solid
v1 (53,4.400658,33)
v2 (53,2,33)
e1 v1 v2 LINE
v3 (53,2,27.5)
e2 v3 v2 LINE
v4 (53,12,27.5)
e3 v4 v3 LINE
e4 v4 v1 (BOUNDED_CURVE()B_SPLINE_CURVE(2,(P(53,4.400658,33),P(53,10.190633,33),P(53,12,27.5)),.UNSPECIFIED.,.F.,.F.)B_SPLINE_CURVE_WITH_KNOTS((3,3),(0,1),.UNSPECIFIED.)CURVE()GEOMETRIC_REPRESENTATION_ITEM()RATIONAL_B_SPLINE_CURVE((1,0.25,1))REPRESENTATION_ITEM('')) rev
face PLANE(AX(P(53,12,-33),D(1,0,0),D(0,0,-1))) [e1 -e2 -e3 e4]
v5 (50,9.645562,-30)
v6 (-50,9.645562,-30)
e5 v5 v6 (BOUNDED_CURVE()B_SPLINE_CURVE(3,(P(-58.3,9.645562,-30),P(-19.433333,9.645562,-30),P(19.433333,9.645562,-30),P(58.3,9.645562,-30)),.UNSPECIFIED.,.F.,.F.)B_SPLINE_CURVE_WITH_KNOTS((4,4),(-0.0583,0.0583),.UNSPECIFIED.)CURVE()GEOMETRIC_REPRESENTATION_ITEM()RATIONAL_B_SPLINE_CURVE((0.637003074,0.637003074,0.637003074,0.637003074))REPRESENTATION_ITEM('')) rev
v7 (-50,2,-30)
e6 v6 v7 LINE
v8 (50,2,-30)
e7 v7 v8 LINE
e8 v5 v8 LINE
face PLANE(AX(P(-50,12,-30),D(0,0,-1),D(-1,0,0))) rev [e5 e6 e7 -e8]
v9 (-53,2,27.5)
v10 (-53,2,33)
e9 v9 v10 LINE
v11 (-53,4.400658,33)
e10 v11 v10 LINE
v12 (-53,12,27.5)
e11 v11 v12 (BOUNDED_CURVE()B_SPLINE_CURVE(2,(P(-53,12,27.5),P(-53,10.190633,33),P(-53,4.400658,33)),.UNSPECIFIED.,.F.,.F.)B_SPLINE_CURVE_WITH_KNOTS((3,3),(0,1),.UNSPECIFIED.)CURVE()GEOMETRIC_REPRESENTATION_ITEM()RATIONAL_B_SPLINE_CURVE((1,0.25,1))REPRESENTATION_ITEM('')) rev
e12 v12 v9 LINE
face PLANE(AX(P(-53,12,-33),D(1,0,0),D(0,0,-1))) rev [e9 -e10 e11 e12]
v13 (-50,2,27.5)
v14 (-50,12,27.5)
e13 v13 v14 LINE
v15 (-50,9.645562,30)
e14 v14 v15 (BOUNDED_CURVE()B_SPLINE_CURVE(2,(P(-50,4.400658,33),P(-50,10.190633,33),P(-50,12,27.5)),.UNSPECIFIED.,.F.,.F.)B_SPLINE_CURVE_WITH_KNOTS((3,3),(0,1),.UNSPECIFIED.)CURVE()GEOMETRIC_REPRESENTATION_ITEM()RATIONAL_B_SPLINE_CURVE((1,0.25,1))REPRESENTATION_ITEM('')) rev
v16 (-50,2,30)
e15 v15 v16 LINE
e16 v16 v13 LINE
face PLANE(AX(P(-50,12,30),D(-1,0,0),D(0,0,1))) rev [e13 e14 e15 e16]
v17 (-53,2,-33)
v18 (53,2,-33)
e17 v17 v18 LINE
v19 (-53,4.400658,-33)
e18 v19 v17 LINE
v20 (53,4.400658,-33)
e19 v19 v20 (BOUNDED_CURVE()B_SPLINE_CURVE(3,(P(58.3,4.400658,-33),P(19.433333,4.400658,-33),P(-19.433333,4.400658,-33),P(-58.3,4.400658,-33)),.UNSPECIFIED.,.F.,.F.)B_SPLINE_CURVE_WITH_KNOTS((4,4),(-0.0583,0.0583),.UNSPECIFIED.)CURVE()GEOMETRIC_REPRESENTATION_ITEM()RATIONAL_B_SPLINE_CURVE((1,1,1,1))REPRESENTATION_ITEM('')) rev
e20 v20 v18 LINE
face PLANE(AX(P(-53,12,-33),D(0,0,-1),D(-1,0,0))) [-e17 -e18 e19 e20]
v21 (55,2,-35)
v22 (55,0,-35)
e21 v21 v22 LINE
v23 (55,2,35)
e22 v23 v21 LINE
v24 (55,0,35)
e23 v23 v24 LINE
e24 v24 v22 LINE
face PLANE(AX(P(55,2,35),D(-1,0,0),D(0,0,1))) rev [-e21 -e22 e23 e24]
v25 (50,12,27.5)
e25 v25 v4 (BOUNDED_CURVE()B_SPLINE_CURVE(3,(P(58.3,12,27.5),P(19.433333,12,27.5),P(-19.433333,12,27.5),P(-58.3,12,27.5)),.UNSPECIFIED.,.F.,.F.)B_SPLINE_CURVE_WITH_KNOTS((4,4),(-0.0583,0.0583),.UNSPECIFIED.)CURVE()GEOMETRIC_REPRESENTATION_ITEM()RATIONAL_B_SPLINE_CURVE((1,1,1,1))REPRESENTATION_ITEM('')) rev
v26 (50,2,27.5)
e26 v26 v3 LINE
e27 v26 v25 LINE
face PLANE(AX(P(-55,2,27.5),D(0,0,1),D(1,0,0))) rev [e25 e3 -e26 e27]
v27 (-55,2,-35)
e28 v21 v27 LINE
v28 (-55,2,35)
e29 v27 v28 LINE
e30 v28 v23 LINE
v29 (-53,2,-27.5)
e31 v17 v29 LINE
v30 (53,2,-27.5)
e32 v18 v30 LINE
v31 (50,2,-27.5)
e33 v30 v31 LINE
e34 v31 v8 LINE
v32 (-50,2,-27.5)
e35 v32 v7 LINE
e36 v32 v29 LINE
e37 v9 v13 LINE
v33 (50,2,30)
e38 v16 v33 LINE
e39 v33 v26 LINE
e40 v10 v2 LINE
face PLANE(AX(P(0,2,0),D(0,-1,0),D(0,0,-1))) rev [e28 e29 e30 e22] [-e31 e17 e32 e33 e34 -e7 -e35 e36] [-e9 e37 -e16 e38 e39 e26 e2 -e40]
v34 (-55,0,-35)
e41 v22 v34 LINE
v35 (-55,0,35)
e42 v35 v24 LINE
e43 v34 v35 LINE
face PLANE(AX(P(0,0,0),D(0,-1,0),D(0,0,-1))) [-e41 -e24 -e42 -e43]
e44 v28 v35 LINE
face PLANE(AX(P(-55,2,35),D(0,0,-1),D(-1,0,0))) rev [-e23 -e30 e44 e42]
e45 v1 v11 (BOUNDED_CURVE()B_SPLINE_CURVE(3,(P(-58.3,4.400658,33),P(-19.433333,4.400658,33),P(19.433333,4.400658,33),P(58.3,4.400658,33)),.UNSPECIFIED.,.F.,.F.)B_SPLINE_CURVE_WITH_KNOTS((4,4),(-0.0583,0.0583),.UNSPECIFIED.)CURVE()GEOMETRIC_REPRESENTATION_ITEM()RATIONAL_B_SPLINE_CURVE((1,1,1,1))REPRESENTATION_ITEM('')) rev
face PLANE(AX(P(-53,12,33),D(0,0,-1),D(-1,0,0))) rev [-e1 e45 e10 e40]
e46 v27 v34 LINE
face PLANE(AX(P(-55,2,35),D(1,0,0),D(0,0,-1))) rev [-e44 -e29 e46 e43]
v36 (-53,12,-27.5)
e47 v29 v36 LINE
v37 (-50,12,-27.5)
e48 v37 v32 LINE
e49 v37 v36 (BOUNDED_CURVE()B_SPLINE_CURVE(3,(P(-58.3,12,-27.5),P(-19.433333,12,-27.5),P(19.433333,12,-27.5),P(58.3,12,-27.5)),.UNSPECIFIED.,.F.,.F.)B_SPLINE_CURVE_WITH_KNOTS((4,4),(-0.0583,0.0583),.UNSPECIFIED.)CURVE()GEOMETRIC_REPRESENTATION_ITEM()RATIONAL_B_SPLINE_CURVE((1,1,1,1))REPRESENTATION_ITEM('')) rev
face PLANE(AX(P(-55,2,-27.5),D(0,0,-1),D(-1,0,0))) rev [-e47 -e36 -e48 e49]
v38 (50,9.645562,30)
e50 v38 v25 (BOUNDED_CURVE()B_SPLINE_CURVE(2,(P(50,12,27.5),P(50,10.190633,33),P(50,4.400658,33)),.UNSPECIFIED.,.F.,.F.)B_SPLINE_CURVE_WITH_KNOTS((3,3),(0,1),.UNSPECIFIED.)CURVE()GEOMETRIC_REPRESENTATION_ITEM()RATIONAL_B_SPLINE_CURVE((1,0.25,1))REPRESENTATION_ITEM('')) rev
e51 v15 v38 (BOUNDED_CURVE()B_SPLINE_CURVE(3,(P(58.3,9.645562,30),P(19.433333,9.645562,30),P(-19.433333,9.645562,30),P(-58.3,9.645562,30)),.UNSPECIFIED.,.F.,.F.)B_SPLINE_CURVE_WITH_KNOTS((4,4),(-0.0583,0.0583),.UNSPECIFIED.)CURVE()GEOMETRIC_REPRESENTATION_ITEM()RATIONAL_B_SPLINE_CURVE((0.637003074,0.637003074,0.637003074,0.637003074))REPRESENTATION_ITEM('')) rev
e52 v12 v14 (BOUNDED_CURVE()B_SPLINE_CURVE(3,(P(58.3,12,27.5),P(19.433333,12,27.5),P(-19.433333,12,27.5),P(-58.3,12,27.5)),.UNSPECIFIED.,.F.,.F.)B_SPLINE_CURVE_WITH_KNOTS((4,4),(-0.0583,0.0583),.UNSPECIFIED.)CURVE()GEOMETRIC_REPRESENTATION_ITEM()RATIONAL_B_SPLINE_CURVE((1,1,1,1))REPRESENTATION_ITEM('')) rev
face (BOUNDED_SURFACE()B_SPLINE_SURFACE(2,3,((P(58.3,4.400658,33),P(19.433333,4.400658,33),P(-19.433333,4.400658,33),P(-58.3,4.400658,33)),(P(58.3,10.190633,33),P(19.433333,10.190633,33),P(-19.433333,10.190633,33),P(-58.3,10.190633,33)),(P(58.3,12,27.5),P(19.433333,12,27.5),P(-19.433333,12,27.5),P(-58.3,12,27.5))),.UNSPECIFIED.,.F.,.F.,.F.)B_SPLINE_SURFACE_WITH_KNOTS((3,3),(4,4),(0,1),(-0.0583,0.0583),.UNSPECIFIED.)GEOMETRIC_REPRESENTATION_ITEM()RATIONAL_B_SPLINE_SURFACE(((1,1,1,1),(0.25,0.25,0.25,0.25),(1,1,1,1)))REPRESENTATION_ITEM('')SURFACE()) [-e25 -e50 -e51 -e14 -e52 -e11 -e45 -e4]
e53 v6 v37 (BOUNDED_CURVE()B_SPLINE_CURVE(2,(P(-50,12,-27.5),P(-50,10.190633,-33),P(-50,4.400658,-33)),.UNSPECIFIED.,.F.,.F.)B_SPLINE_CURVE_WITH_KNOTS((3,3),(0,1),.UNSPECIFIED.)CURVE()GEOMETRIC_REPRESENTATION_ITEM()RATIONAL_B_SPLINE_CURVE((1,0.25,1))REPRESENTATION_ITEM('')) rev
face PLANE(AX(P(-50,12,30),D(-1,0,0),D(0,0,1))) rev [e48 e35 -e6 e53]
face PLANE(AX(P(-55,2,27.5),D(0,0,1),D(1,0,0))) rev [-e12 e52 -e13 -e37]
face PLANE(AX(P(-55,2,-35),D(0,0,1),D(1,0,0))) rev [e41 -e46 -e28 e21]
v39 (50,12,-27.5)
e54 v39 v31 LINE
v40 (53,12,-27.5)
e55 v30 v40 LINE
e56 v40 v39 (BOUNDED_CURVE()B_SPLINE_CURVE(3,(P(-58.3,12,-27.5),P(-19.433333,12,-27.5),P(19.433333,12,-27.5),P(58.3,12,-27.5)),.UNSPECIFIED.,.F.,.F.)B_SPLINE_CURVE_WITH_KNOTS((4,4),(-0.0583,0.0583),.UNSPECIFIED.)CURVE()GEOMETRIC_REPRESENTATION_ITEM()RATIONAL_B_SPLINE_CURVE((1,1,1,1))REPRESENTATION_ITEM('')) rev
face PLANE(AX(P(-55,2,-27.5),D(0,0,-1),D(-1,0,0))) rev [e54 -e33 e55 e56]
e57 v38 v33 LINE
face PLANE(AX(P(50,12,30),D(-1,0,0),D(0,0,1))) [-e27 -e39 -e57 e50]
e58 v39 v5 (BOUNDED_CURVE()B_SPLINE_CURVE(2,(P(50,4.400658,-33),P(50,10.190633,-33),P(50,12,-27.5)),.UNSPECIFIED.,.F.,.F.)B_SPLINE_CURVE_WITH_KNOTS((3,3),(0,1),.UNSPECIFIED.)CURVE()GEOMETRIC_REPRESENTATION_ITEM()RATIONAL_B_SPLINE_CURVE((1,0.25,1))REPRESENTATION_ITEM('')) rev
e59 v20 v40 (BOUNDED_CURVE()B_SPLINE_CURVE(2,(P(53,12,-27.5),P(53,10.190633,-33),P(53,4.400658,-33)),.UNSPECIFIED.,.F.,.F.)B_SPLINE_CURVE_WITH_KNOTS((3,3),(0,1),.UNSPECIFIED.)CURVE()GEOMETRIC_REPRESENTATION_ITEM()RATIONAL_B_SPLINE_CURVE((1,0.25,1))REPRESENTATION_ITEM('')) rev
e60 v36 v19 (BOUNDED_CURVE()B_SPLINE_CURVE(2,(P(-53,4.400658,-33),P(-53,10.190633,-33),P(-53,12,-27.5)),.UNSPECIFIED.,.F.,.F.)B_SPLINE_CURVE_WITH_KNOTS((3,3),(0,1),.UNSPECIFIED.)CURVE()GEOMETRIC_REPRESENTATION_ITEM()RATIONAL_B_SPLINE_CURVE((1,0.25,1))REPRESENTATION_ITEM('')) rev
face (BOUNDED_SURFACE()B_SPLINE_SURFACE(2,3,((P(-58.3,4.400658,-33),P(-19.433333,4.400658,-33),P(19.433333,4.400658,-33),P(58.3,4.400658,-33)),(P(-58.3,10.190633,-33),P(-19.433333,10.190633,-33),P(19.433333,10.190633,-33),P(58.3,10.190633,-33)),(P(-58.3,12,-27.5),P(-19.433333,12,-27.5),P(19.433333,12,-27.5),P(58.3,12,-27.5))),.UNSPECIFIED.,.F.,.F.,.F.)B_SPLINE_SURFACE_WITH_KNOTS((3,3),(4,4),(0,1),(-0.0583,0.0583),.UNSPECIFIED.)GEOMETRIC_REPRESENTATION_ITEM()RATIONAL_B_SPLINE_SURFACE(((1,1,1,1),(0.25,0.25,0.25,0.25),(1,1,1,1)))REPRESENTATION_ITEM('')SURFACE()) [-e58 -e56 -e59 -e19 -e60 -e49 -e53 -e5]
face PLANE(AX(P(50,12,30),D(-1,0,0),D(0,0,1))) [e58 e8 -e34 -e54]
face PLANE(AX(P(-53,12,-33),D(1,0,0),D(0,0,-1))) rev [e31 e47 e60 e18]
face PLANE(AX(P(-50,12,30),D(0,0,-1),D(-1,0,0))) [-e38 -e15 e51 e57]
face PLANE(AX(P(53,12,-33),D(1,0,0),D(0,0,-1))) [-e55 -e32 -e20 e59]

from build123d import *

# Parameters (mm, degrees)
CROQUIS1_W              = 110
CROQUIS1_H              = 70
SALIENTE_EXTRUIR1_DEPTH = 2
CROQUIS2_W              = 106
CROQUIS2_H              = 66
CROQUIS2_W_2            = 100
CROQUIS2_H_2            = 60
SALIENTE_EXTRUIR2_DEPTH = 10
CROQUIS3_W              = 110
CROQUIS3_H              = 55
CORTAR_EXTRUIR1_DEPTH   = 10
REDONDEO1_START         = -53
REDONDEO1_DEPTH         = 106


with BuildPart() as part:
    # Croquis1 → Saliente-Extruir1 (new body)
    with BuildSketch(Plane(origin=(0, 0, 0), x_dir=(1, 0, 0), z_dir=(0, 1, 0))):
        Rectangle(CROQUIS1_W, CROQUIS1_H)
    extrude(amount=SALIENTE_EXTRUIR1_DEPTH)

    # Croquis2 → Saliente-Extruir2 (add)
    with BuildSketch(Plane(origin=(0, 2, 0), x_dir=(1, 0, 0), z_dir=(0, 1, 0))):
        Rectangle(CROQUIS2_W, CROQUIS2_H)
        Rectangle(CROQUIS2_W_2, CROQUIS2_H_2, mode=Mode.SUBTRACT)
    extrude(amount=SALIENTE_EXTRUIR2_DEPTH)

    # Croquis3 → Cortar-Extruir1 (cut)
    with BuildSketch(Plane(origin=(0, 12, 0), x_dir=(1, 0, 0), z_dir=(0, 1, 0))):
        Rectangle(CROQUIS3_W, CROQUIS3_H)
    extrude(amount=-CORTAR_EXTRUIR1_DEPTH, mode=Mode.SUBTRACT)

    # Redondeo1: read off the stored shape, not the designer's step
    # Redondeo1 outline → Redondeo1 (cut)
    with BuildSketch(Plane.YZ.offset(REDONDEO1_START)):
        with BuildLine():
            Line((4.400657923, -33), (12, -33))
            Line((12, -33), (12, -27.5))
            add(Edge.make_bspline(
                [(12, -27.5), (11.925717186, -27.725800205), (11.717980707, -28.062974077), (11.294012734, -28.57513658), (10.552168001, -29.267993446), (8.343872585, -31.051001592), (6.627785298, -32.237452301), (5.39060754, -32.810235795), (4.741950411, -33), (4.400657923, -33)],
                knots=[0.589454173, 0.589454173, 0.589454173, 0.589454173, 0.589454173, 0.589454173, 1, 1, 1, 1, 1.589454173, 1.589454173, 1.589454173, 1.589454173, 1.589454173, 1.589454173], degree=5, weights=[1, 1, 1.007998589, 1.001618266, 1, 1, 0.973408773, 1.007044093, 1, 1]))
        make_face()
        with BuildLine():
            Line((12, 33), (4.400657923, 33))
            add(Edge.make_bspline(
                [(4.400657923, 33), (4.741950411, 33), (5.39060754, 32.810235795), (6.627785298, 32.237452301), (8.343872585, 31.051001592), (10.552168001, 29.267993446), (11.294012734, 28.57513658), (11.717980707, 28.062974077), (11.925717186, 27.725800205), (12, 27.5)],
                knots=[0, 0, 0, 0, 0, 0, 0.589454173, 0.589454173, 0.589454173, 0.589454173, 1, 1, 1, 1, 1, 1], degree=5, weights=[1, 1, 1.007044093, 0.973408773, 1, 1, 1.001618266, 1.007998589, 1, 1]))
            Line((12, 27.5), (12, 33))
        make_face()
    extrude(amount=REDONDEO1_DEPTH, mode=Mode.SUBTRACT)


solid = part.part
